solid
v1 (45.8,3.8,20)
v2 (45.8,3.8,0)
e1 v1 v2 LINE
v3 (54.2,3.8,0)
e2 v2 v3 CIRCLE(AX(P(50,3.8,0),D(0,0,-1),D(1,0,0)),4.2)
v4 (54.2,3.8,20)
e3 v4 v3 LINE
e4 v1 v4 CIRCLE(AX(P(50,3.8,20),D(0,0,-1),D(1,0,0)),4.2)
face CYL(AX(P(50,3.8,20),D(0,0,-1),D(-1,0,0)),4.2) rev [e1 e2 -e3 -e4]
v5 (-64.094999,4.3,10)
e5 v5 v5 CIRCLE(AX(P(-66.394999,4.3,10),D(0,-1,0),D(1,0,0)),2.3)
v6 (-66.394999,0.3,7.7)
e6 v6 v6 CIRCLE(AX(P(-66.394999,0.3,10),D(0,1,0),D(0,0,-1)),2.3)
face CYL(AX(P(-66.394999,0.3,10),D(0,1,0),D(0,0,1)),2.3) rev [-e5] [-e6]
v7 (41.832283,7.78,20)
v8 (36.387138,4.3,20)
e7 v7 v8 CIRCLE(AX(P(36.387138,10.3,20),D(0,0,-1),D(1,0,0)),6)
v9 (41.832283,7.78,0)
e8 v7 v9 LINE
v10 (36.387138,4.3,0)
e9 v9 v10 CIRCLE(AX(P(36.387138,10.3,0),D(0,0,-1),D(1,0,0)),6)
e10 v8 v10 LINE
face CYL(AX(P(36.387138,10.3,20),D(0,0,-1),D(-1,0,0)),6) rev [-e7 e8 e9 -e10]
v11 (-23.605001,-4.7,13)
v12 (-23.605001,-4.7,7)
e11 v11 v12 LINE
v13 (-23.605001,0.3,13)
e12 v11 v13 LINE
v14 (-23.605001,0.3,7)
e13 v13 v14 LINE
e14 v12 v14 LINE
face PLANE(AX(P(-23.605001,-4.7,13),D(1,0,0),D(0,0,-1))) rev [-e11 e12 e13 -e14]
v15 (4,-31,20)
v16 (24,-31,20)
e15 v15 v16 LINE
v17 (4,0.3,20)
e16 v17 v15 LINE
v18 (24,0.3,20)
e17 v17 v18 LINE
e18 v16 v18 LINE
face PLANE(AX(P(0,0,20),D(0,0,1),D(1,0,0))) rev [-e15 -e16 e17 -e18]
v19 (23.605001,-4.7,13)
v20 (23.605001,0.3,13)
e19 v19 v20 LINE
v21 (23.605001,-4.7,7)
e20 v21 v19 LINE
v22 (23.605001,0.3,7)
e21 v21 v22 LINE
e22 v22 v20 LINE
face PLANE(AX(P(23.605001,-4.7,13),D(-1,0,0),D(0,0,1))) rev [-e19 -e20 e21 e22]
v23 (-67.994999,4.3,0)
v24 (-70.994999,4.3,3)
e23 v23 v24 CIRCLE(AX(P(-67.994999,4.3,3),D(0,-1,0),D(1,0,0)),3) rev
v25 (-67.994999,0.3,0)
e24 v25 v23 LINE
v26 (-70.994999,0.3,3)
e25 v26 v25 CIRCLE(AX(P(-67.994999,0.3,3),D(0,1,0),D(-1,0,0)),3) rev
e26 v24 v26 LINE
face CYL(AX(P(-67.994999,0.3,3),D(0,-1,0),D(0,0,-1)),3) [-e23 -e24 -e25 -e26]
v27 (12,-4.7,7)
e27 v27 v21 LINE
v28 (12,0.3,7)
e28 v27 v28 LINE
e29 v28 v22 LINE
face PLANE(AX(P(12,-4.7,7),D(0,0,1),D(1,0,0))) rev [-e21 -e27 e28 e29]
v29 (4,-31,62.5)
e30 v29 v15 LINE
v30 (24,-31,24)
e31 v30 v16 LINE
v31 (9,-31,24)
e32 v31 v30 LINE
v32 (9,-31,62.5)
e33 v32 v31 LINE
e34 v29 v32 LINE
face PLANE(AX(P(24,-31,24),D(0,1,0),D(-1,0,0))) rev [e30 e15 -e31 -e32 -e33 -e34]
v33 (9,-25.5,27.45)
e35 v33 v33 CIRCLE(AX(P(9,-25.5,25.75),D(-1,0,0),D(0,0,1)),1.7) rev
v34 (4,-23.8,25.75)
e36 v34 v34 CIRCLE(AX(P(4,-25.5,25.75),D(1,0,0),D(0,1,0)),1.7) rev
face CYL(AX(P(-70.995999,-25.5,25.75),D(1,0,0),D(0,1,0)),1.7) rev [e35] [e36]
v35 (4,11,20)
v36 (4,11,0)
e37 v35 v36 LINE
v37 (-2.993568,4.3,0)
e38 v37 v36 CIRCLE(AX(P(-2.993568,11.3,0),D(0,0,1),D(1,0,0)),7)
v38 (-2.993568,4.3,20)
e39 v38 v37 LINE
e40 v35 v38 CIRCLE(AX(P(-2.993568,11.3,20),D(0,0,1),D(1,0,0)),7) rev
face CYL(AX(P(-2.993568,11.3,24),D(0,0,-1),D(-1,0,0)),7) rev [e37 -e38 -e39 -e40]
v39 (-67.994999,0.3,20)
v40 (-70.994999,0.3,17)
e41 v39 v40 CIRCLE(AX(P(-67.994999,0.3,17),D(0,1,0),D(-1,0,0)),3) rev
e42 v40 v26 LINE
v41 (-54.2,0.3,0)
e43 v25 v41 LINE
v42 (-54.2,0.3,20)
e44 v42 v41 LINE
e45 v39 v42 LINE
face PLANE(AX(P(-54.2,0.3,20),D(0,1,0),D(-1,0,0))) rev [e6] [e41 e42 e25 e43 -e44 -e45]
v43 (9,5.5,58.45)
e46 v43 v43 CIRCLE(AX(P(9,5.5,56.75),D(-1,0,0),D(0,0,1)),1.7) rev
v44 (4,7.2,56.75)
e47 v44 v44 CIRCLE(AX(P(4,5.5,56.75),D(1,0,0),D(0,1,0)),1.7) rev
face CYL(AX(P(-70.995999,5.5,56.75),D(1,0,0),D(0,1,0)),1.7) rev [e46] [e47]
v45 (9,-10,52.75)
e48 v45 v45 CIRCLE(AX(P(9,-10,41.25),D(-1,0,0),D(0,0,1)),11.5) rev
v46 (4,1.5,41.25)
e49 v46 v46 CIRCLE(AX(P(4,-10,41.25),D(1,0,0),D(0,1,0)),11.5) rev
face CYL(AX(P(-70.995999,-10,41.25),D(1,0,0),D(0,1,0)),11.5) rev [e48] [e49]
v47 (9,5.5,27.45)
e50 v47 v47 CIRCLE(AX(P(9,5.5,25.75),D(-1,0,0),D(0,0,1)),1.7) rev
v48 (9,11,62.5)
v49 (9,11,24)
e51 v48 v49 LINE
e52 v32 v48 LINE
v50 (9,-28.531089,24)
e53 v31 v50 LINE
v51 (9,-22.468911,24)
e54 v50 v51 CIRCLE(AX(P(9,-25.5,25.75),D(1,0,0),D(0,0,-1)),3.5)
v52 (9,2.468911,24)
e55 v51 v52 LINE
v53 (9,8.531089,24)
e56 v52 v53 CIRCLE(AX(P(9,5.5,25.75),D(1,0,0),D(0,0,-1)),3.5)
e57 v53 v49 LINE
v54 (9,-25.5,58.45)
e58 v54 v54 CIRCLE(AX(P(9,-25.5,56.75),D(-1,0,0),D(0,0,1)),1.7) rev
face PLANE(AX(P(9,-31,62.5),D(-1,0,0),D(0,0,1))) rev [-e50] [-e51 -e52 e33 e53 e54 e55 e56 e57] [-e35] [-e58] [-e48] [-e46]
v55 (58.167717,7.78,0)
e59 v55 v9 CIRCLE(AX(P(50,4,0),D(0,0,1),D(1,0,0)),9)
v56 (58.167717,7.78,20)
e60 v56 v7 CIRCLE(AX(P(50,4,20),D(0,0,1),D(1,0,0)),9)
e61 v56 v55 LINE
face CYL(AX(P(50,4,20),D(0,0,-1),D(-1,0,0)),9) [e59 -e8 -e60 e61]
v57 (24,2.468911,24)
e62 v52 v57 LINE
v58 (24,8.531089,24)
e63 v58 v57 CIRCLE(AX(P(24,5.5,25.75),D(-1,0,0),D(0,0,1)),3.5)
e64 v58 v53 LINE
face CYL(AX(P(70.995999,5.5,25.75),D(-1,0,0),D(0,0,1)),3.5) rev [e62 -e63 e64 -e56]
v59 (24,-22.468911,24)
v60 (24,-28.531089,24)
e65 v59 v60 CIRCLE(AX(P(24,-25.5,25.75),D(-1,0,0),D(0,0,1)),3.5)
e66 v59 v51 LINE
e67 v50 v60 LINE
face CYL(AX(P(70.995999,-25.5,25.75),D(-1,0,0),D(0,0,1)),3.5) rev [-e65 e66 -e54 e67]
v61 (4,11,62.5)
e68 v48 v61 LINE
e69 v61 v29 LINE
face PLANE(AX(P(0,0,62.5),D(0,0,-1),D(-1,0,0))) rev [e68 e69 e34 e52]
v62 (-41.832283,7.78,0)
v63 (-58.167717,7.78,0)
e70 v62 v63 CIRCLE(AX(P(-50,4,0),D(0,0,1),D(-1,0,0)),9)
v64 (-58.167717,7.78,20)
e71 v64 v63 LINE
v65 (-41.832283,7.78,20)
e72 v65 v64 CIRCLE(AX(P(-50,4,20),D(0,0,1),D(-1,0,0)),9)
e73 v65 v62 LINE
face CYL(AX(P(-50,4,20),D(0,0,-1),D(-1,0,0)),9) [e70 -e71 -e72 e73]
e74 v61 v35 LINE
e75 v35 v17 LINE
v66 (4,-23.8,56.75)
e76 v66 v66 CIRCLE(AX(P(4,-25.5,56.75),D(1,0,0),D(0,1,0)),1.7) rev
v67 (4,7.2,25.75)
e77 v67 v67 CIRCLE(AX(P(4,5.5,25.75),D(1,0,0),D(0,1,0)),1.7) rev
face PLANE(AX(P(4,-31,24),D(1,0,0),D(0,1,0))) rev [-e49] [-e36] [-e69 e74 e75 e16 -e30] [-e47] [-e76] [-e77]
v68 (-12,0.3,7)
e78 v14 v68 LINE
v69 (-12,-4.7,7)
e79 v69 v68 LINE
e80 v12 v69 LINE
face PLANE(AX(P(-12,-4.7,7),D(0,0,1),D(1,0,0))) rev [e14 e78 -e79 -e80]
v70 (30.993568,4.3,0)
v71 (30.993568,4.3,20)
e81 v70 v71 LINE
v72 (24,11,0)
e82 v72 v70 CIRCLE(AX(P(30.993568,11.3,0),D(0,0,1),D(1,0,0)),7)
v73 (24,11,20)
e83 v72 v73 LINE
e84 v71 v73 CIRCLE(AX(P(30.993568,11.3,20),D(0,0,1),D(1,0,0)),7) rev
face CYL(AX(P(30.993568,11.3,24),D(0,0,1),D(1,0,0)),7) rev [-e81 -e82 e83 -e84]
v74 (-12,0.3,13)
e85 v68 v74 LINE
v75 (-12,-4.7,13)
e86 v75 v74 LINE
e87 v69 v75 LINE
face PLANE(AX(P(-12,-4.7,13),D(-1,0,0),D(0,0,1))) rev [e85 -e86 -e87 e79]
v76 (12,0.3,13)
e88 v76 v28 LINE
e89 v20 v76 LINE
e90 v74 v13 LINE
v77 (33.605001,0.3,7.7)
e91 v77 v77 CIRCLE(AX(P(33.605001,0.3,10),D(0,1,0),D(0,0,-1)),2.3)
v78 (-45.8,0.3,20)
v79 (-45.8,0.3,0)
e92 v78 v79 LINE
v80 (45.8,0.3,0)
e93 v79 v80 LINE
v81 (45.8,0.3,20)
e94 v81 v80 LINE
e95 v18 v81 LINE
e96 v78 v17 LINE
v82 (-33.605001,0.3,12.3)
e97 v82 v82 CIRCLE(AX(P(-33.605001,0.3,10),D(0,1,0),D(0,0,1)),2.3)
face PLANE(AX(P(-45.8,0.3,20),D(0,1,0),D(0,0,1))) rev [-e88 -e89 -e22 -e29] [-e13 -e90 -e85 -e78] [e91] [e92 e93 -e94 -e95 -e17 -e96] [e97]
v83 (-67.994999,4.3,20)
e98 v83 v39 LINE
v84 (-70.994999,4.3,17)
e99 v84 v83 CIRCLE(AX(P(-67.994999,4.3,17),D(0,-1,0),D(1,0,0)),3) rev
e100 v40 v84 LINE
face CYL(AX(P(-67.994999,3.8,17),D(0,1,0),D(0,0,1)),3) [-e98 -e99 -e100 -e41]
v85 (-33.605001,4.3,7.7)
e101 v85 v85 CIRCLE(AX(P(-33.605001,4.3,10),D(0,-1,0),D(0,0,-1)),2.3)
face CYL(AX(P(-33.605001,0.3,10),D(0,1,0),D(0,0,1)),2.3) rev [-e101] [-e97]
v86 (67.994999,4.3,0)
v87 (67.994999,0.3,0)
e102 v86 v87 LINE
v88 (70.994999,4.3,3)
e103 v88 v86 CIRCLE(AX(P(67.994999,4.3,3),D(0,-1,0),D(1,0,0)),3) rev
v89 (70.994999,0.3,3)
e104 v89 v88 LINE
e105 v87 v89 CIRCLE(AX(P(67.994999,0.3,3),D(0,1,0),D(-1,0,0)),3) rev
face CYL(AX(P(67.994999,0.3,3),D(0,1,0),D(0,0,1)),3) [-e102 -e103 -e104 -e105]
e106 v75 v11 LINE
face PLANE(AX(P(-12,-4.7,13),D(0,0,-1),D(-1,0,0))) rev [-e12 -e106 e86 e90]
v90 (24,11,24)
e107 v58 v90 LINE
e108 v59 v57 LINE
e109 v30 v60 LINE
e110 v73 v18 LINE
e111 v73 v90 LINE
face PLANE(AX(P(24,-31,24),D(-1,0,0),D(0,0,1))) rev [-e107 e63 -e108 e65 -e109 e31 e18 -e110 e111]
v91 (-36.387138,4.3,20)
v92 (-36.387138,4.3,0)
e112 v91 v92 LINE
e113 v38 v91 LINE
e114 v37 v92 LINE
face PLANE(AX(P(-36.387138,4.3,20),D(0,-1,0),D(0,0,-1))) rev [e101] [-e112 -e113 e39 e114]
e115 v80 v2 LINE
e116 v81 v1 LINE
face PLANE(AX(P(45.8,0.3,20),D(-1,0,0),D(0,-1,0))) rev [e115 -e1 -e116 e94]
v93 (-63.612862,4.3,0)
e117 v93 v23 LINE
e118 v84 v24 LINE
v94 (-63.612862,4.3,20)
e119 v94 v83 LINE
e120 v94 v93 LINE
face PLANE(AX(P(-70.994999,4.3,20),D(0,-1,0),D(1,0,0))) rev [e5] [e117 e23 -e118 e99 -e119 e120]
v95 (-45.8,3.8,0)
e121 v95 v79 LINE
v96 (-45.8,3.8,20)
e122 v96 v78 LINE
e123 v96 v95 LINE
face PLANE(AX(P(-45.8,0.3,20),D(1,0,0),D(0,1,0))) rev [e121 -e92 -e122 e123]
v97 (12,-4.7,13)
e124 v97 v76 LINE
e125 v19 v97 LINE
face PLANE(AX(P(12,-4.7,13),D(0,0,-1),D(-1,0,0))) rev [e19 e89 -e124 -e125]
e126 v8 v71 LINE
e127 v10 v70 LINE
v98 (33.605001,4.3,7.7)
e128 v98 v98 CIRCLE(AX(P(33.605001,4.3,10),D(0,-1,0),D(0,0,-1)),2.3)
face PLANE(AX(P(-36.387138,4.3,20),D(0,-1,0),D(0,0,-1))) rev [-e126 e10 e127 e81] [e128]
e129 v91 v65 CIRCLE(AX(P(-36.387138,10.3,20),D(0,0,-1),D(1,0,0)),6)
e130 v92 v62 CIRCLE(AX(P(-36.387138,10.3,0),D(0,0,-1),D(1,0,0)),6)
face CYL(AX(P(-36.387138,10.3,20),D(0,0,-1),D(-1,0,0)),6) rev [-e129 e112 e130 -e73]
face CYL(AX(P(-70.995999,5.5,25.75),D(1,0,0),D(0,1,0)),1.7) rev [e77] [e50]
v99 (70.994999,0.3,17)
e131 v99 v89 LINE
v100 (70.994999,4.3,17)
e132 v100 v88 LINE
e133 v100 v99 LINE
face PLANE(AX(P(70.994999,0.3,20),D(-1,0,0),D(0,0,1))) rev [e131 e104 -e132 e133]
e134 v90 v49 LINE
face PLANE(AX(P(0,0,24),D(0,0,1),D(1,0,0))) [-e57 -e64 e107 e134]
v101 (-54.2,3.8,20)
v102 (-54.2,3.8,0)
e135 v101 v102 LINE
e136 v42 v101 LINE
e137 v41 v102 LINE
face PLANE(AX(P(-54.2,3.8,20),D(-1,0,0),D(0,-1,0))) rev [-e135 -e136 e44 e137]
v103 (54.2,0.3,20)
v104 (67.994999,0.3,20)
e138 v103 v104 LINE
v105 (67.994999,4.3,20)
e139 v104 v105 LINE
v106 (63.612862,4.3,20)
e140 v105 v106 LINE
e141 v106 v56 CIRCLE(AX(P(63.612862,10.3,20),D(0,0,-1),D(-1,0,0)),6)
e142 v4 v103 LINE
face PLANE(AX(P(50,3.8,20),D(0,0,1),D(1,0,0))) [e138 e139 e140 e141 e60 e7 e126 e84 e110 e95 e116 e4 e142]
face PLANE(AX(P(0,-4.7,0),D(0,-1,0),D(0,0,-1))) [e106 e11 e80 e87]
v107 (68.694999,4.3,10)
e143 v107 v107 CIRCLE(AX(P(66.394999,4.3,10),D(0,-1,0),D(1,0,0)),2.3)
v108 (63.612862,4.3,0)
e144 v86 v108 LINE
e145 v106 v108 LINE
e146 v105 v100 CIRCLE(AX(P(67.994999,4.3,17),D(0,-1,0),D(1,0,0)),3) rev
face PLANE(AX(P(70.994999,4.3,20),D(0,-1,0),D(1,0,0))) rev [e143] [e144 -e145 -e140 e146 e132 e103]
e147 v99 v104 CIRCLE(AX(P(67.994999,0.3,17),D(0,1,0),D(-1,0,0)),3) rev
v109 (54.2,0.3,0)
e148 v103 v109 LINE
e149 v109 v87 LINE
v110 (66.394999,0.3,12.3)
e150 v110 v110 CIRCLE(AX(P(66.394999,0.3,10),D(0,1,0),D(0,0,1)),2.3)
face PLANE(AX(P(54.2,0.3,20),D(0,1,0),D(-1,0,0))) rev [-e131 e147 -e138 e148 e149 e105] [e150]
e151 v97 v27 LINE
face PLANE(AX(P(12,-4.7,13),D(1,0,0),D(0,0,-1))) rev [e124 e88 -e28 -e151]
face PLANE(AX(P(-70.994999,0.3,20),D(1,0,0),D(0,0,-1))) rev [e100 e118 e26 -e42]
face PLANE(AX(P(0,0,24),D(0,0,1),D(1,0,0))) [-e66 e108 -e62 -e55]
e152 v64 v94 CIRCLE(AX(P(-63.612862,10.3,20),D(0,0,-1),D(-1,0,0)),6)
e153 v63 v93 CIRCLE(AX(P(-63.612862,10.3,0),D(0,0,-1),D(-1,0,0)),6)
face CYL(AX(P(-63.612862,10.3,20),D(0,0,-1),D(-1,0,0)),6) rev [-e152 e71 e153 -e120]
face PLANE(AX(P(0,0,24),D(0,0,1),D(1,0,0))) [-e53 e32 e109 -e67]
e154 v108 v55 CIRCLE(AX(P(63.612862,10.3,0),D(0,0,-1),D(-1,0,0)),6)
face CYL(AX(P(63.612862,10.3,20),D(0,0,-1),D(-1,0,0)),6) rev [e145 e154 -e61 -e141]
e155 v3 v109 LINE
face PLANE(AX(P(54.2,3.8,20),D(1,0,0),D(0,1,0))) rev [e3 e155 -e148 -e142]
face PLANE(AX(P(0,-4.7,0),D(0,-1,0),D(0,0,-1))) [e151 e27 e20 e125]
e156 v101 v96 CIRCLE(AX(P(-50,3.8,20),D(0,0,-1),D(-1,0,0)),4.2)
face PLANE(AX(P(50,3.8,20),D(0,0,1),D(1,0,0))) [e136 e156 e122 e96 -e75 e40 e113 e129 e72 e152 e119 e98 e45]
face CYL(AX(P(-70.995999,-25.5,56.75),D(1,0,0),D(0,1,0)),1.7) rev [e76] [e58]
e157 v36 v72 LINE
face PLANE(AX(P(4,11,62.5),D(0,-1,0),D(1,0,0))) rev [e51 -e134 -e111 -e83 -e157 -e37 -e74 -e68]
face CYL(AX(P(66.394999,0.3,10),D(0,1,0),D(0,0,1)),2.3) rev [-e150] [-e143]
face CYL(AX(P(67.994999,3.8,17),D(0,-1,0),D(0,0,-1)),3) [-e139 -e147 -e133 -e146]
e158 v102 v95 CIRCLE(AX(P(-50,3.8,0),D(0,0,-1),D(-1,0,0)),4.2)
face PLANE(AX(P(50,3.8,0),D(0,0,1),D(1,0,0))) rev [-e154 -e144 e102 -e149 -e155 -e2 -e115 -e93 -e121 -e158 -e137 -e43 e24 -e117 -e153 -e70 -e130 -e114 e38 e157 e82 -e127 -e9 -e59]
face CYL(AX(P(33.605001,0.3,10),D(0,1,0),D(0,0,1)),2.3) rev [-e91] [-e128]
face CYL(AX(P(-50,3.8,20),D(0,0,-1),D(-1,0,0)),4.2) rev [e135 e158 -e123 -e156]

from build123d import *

# Parameters (mm, degrees)
EXTRUDE_1_DEPTH          = 20
FILLET_1_R               = 3
CUT_EXTRUDE_1_DEPTH      = 75.269642706
CUT_EXTRUDE_1_DEPTH_BACK = 75.269642706
SKETCH_2_R               = 2.3
SKETCH_3_W               = 20
SKETCH_3_H               = 35.3
EXTRUDE_2_DEPTH          = 4
SKETCH_4_W               = 5
SKETCH_4_H               = 42
EXTRUDE_3_DEPTH          = 38.5
EXTRUDE_4_DEPTH          = 6.7
CUT_EXTRUDE_2_REACH      = 119.861
SKETCH_6_R               = 11.5
SKETCH_6_R_2             = 1.7
FILLET_2_R               = 7
CUT_EXTRUDE_3_REACH      = 108.144
SKETCH_9_R               = 3.5
SKETCH_10_W              = 11.60500139
SKETCH_10_H              = 6
EXTRUDE_6_DEPTH          = 5


with BuildPart() as part:
    # 草图1 → 凸台-拉伸1 (new body)
    with BuildSketch(Plane.XY):
        with BuildLine():
            Line((54.2, 3.8), (54.2, 0.3))
            Line((54.2, 0.3), (70.99499861, 0.3))
            Line((70.99499861, 0.3), (70.99499861, 4.3))
            Line((70.99499861, 4.3), (63.612861565, 4.3))
            ThreePointArc((63.612861565, 4.3), (60.381762681, 5.244310136), (58.167716939, 7.78))
            ThreePointArc((58.167716939, 7.78), (50, 13), (41.832283061, 7.78))
            ThreePointArc((41.832283061, 7.78), (39.618237319, 5.244310136), (36.387138435, 4.3))
            Line((36.387138435, 4.3), (-36.387138435, 4.3))
            ThreePointArc((-36.387138435, 4.3), (-39.618237319, 5.244310136), (-41.832283061, 7.78))
            ThreePointArc((-41.832283061, 7.78), (-50, 13), (-58.167716939, 7.78))
            ThreePointArc((-58.167716939, 7.78), (-60.381762681, 5.244310136), (-63.612861565, 4.3))
            Line((-63.612861565, 4.3), (-70.99499861, 4.3))
            Line((-70.99499861, 4.3), (-70.99499861, 0.3))
            Line((-70.99499861, 0.3), (-54.2, 0.3))
            Line((-54.2, 0.3), (-54.2, 3.8))
            ThreePointArc((-54.2, 3.8), (-50, 8), (-45.8, 3.8))
            Line((-45.8, 3.8), (-45.8, 0.3))
            Line((-45.8, 0.3), (45.8, 0.3))
            Line((45.8, 0.3), (45.8, 3.8))
            ThreePointArc((45.8, 3.8), (50, 8), (54.2, 3.8))
        make_face()
    extrude(amount=EXTRUDE_1_DEPTH)

    # 圆角1
    fillet_1_edges = [part.edges().sort_by_distance(p)[0] for p in [
        (70.99499861, 2.3, 20),
        (-70.99499861, 2.3, 0),
        (70.99499861, 2.3, 0),
        (-70.99499861, 2.3, 20),
    ]]
    fillet(fillet_1_edges, radius=FILLET_1_R)

    # 草图2 → 切除-拉伸1 (cut, two sides: drawn at the far end of the back side and taken through both)
    with BuildSketch(Plane(origin=(0, 4.3, 0), x_dir=(1, 0, 0), z_dir=(0, 1, 0)).offset(-CUT_EXTRUDE_1_DEPTH_BACK)):
        with Locations(Location((66.39499861, -10, 0), (0, 0, 270))):
            Circle(SKETCH_2_R)
        with Locations(Location((33.60500139, -10, 0), (0, 0, 90))):
            Circle(SKETCH_2_R)
        with Locations(Location((-33.60500139, -10, 0), (0, 0, 270))):
            Circle(SKETCH_2_R)
        with Locations((-66.39499861, -10)):
            Circle(SKETCH_2_R)
    extrude(amount=CUT_EXTRUDE_1_DEPTH + CUT_EXTRUDE_1_DEPTH_BACK, mode=Mode.SUBTRACT)

    # 草图3 → 凸台-拉伸2 (add)
    with BuildSketch(Plane.XY.offset(20)):
        with Locations((14, -13.35)):
            Rectangle(SKETCH_3_W, SKETCH_3_H)
    extrude(amount=EXTRUDE_2_DEPTH)

    # 草图4 → 凸台-拉伸3 (add)
    with BuildSketch(Plane.XY.offset(24)):
        with Locations((6.5, -10)):
            Rectangle(SKETCH_4_W, SKETCH_4_H)
    extrude(amount=EXTRUDE_3_DEPTH)

    # 草图5 → 凸台-拉伸4 (add)
    with BuildSketch(Plane(origin=(0, 4.3, 0), x_dir=(1, 0, 0), z_dir=(0, 1, 0))):
        Polygon((4, -13), (4, -24), (24, -24), (24, 0), (4, 0), align=None)
    extrude(amount=EXTRUDE_4_DEPTH)

    # 草图6 → 切除-拉伸2 (cut, up to next)
    with BuildSketch(Plane(origin=(24, 0, 0), x_dir=(0, 0, -1), z_dir=(1, 0, 0)), mode=Mode.PRIVATE) as cut_extrude_2_sk1:
        with Locations(Location((-41.25, -10, 0), (0, 0, 90))):
            Circle(SKETCH_6_R)
    cut_extrude_2_tool1 = extrude(cut_extrude_2_sk1.sketch, amount=-CUT_EXTRUDE_2_REACH, mode=Mode.PRIVATE) & part.part
    # 草图6 → 切除-拉伸2 (cut, up to next)
    with BuildSketch(Plane(origin=(24, 0, 0), x_dir=(0, 0, -1), z_dir=(1, 0, 0)), mode=Mode.PRIVATE) as cut_extrude_2_sk2:
        with Locations(Location((-25.75, 5.5, 0), (0, 0, 90))):
            Circle(SKETCH_6_R_2)
    cut_extrude_2_tool2 = extrude(cut_extrude_2_sk2.sketch, amount=-CUT_EXTRUDE_2_REACH, mode=Mode.PRIVATE) & part.part
    # 草图6 → 切除-拉伸2 (cut, up to next)
    with BuildSketch(Plane(origin=(24, 0, 0), x_dir=(0, 0, -1), z_dir=(1, 0, 0)), mode=Mode.PRIVATE) as cut_extrude_2_sk3:
        with Locations(Location((-25.75, -25.5, 0), (0, 0, 90))):
            Circle(SKETCH_6_R_2)
    cut_extrude_2_tool3 = extrude(cut_extrude_2_sk3.sketch, amount=-CUT_EXTRUDE_2_REACH, mode=Mode.PRIVATE) & part.part
    # 草图6 → 切除-拉伸2 (cut, up to next)
    with BuildSketch(Plane(origin=(24, 0, 0), x_dir=(0, 0, -1), z_dir=(1, 0, 0)), mode=Mode.PRIVATE) as cut_extrude_2_sk4:
        with Locations(Location((-56.75, -25.5, 0), (0, 0, 90))):
            Circle(SKETCH_6_R_2)
    cut_extrude_2_tool4 = extrude(cut_extrude_2_sk4.sketch, amount=-CUT_EXTRUDE_2_REACH, mode=Mode.PRIVATE) & part.part
    # 草图6 → 切除-拉伸2 (cut, up to next)
    with BuildSketch(Plane(origin=(24, 0, 0), x_dir=(0, 0, -1), z_dir=(1, 0, 0)), mode=Mode.PRIVATE) as cut_extrude_2_sk5:
        with Locations(Location((-56.75, 5.5, 0), (0, 0, 90))):
            Circle(SKETCH_6_R_2)
    cut_extrude_2_tool5 = extrude(cut_extrude_2_sk5.sketch, amount=-CUT_EXTRUDE_2_REACH, mode=Mode.PRIVATE) & part.part
    add(cut_extrude_2_tool1.solids().sort_by_distance((24, -10, 41.25))[0], mode=Mode.SUBTRACT)
    add(cut_extrude_2_tool2.solids().sort_by_distance((24, 5.5, 25.75))[0], mode=Mode.SUBTRACT)
    add(cut_extrude_2_tool3.solids().sort_by_distance((24, -25.5, 25.75))[0], mode=Mode.SUBTRACT)
    add(cut_extrude_2_tool4.solids().sort_by_distance((24, -25.5, 56.75))[0], mode=Mode.SUBTRACT)
    add(cut_extrude_2_tool5.solids().sort_by_distance((24, 5.5, 56.75))[0], mode=Mode.SUBTRACT)

    # 圆角2
    # the kernel refuses this fillet: 7 mm, written as the material it adds along each edge
    with BuildSketch(Plane(origin=(4, 4.3, 0), x_dir=(0, 1, 0), z_dir=(0, 0, 1))) as fillet_2_piece_1:
        with BuildLine():
            CenterArc((7, 6.993568474), FILLET_2_R, 180, 87.543714276)
            Line((0, 6.993568474), (-0.14, 6.993568474))
            Line((-0.14, 6.993568474), (-0.14, 0))
            Line((-0.14, 0), (0, -0.14))
            ThreePointArc((0, -0.14), (3.35, -0.14), (6.694, -0.139871369))
            Line((6.694, -0.139871369), (6.7, 0))
        make_face()
    extrude(amount=20)
    with BuildSketch(Plane(origin=(24, 4.3, 20), x_dir=(1, 0, 0), z_dir=(0, 0, -1))) as fillet_2_piece_2:
        with BuildLine():
            CenterArc((6.993568474, -7), FILLET_2_R, 90, 87.543714276)
            Line((0, -6.7), (-0.139871369, -6.694))
            ThreePointArc((-0.139871369, -6.694), (-0.14, -3.35), (-0.14, 0))
            Line((-0.14, 0), (0, 0.14))
            Line((0, 0.14), (6.993568474, 0.14))
            Line((6.993568474, 0.14), (6.993568474, 0))
        make_face()
    extrude(amount=20)

    # 草图9 → 切除-拉伸3 (cut, up to next)
    with BuildSketch(Plane(origin=(9, 0, 0), x_dir=(0, 0, -1), z_dir=(1, 0, 0)), mode=Mode.PRIVATE) as cut_extrude_3_sk1:
        with Locations((-25.75, 5.5)):
            Circle(SKETCH_9_R)
    cut_extrude_3_tool1 = extrude(cut_extrude_3_sk1.sketch, amount=CUT_EXTRUDE_3_REACH, mode=Mode.PRIVATE) & part.part
    # 草图9 → 切除-拉伸3 (cut, up to next)
    with BuildSketch(Plane(origin=(9, 0, 0), x_dir=(0, 0, -1), z_dir=(1, 0, 0)), mode=Mode.PRIVATE) as cut_extrude_3_sk2:
        with Locations((-25.75, -25.5)):
            Circle(SKETCH_9_R)
    cut_extrude_3_tool2 = extrude(cut_extrude_3_sk2.sketch, amount=CUT_EXTRUDE_3_REACH, mode=Mode.PRIVATE) & part.part
    add(cut_extrude_3_tool1.solids().sort_by_distance((9, 5.5, 25.75))[0], mode=Mode.SUBTRACT)
    add(cut_extrude_3_tool2.solids().sort_by_distance((9, -25.5, 25.75))[0], mode=Mode.SUBTRACT)

    # 草图10 → 凸台-拉伸6 (add)
    with BuildSketch(Plane.XZ.offset(-0.3)):
        with Locations((17.802500695, 10)):
            Rectangle(SKETCH_10_W, SKETCH_10_H)
        with Locations((-17.802500695, 10)):
            Rectangle(SKETCH_10_W, SKETCH_10_H)
    extrude(amount=EXTRUDE_6_DEPTH)


solid = part.part
